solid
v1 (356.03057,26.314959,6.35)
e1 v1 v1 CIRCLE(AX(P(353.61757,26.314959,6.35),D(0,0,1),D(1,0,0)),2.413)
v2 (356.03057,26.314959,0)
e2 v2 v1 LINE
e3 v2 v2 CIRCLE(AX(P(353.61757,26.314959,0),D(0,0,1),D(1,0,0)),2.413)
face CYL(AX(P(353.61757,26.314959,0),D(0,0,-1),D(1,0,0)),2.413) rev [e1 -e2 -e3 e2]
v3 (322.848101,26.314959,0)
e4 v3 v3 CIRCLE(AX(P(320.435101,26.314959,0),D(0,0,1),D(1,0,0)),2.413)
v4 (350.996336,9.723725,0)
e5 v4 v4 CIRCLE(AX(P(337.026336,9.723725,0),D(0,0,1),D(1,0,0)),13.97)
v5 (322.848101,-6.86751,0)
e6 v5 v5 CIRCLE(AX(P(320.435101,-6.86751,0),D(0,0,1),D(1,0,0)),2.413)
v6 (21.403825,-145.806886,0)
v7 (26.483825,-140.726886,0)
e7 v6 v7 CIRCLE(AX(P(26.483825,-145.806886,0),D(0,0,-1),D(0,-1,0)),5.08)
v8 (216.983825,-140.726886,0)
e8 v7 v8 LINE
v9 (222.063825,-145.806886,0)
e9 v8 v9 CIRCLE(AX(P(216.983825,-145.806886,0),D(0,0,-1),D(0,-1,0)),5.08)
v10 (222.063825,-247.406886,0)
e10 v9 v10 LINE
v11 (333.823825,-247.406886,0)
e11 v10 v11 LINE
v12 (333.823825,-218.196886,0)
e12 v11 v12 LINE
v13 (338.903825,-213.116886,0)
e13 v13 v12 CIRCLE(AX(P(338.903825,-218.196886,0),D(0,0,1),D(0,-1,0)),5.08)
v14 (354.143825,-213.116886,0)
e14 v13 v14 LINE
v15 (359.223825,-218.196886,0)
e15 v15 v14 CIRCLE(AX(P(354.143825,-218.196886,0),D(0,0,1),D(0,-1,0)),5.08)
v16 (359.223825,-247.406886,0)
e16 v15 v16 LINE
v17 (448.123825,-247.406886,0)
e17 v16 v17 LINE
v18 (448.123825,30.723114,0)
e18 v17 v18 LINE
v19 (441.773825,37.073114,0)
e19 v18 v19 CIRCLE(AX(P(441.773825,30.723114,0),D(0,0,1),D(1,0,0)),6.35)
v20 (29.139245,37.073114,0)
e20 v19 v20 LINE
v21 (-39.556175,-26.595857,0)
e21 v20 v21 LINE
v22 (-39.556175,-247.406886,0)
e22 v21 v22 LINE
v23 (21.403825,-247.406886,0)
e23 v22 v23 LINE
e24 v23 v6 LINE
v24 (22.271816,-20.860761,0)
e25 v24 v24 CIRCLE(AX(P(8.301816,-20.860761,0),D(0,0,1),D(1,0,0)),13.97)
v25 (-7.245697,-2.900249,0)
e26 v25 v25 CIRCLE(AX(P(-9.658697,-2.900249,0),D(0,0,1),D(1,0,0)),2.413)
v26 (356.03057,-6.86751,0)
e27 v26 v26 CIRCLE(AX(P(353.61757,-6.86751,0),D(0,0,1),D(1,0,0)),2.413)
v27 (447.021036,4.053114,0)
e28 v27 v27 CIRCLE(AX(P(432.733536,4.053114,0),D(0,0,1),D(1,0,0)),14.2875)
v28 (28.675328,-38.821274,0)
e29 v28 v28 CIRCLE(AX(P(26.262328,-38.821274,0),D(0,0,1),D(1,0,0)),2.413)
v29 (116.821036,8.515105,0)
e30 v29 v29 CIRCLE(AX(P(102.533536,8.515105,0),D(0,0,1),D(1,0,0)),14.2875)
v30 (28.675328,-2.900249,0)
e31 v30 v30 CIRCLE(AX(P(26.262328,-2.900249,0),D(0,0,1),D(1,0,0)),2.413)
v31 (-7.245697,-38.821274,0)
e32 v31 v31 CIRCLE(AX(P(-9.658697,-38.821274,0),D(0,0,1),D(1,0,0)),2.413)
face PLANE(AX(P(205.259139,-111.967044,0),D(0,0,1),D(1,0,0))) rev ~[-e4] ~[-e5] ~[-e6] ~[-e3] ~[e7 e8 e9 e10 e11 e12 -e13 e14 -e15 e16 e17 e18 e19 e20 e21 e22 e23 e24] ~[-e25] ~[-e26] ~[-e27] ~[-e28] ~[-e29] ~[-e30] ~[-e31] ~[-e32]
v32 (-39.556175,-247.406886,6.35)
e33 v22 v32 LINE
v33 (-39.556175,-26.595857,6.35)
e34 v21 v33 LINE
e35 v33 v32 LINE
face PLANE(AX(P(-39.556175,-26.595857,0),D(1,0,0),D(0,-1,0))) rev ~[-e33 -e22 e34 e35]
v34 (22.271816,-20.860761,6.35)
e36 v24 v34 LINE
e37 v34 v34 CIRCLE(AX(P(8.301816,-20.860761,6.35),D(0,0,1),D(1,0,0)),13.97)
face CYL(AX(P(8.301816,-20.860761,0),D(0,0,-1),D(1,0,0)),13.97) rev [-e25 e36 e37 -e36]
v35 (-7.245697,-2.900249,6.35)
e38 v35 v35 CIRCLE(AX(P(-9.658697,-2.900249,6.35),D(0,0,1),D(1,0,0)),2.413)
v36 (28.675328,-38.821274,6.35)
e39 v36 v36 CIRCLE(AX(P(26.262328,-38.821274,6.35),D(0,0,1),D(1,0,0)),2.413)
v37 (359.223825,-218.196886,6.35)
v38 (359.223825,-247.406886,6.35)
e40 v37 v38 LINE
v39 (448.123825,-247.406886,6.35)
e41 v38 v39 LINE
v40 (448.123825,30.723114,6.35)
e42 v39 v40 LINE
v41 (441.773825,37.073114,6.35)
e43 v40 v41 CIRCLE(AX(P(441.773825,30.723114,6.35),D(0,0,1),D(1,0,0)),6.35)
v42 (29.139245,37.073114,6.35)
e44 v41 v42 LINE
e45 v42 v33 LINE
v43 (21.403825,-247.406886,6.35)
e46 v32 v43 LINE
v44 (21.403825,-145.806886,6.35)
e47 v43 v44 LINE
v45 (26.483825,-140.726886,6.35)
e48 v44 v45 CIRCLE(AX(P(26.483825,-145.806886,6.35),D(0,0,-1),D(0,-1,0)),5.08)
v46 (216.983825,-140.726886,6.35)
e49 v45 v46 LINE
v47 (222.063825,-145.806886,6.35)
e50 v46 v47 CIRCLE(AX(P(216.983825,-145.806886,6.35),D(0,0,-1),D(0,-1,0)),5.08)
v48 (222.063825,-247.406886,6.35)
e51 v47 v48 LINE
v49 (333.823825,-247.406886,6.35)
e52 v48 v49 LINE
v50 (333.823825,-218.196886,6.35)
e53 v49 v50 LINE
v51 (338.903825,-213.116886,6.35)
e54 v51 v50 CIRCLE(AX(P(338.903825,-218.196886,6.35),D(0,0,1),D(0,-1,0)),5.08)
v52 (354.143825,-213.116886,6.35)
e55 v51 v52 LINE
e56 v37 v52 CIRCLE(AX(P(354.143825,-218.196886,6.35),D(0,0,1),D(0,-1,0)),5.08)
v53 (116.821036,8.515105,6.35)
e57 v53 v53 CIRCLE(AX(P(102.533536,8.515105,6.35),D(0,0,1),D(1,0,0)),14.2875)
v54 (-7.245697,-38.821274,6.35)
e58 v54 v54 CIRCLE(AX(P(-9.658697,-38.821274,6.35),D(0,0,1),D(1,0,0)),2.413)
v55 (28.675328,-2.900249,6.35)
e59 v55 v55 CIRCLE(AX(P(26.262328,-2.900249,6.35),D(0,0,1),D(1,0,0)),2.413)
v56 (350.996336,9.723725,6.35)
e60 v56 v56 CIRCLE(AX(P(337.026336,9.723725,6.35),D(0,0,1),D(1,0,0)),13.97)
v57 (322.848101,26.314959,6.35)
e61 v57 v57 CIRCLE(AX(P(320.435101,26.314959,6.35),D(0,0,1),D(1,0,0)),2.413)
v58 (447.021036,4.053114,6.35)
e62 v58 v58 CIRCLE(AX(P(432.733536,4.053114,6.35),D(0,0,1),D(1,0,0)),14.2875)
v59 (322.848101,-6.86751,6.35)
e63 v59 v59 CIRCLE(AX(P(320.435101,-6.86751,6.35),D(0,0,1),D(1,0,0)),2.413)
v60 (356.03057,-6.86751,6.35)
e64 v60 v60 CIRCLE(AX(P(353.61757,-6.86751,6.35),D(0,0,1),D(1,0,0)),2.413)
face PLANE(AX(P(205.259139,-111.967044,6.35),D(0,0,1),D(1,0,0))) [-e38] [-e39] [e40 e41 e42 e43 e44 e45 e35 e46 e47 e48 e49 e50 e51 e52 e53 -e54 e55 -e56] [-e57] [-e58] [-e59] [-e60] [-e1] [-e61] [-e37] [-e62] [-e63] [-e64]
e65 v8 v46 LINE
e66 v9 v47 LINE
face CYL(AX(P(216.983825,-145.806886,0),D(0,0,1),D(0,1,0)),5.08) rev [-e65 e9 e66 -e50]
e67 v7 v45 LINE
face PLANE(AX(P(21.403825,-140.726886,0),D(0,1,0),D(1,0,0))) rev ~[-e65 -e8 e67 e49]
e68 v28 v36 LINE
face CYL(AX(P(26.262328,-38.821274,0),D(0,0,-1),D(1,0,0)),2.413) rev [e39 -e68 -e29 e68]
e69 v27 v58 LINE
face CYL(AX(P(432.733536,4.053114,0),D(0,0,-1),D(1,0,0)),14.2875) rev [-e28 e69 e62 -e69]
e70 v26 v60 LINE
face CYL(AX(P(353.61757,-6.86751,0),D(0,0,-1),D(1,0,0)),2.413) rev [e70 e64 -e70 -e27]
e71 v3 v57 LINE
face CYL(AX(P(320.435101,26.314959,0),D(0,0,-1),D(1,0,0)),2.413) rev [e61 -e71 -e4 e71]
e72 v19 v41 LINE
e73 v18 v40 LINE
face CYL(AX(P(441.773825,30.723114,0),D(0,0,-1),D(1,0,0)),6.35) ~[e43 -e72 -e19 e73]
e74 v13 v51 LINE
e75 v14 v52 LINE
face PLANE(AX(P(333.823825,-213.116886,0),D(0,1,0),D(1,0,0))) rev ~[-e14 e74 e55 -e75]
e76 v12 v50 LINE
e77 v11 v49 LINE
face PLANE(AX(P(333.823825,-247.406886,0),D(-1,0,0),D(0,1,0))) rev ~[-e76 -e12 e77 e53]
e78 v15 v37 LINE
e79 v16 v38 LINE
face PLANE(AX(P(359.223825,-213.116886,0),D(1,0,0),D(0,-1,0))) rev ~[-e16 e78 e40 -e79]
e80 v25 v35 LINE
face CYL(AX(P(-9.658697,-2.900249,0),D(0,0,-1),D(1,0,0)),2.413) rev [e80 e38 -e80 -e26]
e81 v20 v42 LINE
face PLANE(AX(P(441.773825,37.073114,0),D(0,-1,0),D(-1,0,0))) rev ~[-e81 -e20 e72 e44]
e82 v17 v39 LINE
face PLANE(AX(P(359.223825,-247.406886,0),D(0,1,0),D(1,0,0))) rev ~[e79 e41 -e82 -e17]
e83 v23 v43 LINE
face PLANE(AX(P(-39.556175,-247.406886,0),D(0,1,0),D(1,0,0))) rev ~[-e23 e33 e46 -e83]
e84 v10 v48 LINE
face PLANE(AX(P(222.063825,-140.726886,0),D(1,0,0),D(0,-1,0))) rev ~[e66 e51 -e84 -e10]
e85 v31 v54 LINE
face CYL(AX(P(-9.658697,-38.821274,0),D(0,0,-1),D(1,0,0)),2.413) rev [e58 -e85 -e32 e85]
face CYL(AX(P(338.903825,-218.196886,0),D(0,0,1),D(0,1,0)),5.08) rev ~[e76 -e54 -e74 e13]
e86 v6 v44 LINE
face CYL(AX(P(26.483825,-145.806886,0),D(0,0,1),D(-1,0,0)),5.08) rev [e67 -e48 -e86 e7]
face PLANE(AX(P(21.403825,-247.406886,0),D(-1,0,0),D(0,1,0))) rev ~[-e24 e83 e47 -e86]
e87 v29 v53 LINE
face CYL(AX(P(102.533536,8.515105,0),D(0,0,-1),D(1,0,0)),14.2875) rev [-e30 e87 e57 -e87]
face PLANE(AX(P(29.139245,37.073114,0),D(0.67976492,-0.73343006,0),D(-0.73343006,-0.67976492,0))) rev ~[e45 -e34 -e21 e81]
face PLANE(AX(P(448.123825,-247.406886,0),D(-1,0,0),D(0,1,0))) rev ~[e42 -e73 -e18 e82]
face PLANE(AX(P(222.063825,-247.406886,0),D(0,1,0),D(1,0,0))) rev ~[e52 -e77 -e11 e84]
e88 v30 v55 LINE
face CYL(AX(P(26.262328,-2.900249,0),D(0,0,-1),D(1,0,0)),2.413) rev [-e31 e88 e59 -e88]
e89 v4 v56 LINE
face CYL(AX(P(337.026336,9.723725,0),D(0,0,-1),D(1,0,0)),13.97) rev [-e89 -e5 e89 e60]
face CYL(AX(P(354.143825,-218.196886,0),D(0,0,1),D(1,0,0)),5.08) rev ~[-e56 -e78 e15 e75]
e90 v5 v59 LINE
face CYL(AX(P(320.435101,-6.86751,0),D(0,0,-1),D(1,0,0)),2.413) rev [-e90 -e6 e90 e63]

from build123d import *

# Parameters (mm, degrees)
F0_R     = 2.413
F0_R_2   = 13.97
F0_R_3   = 14.2875
F1_DEPTH = 6.35
F2_R     = 5.08


# Not quite as in the source:
# - a length typed as a fraction of an inch, garbled in the dataset ("3 / 203.2 mm" for 3/8 in), is restored


with BuildPart() as f1:
    # F0 (on Top) → F1 (new body)
    with BuildSketch(Plane.XY):
        with BuildLine():
            Line((441.7738245296, 37.0731139821), (29.1392452401, 37.0731139821))
            Line((29.1392452401, 37.0731139821), (-39.5561754704, -26.5958569453))
            Line((-39.5561754704, -26.5958569453), (-39.5561754704, -247.4068860179))
            Line((-39.5561754704, -247.4068860179), (21.4038245296, -247.4068860179))
            Line((21.4038245296, -247.4068860179), (21.4038245296, -140.7268860179))
            Line((21.4038245296, -140.7268860179), (222.0638245296, -140.7268860179))
            Line((222.0638245296, -140.7268860179), (222.0638245296, -247.4068860179))
            Line((222.0638245296, -247.4068860179), (333.8238245296, -247.4068860179))
            Line((333.8238245296, -247.4068860179), (333.8238245296, -213.1168860179))
            Line((333.8238245296, -213.1168860179), (359.2238245296, -213.1168860179))
            Line((359.2238245296, -213.1168860179), (359.2238245296, -247.4068860179))
            Line((359.2238245296, -247.4068860179), (448.1238245296, -247.4068860179))
            Line((448.1238245296, -247.4068860179), (448.1238245296, 30.7231139821))
            ThreePointArc((448.1238245296, 30.7231139821), (446.2639525902, 35.2132420426), (441.7738245296, 37.0731139821))
        make_face()
        with Locations((-9.6586965698, -38.8212736462)):
            Circle(F0_R, mode=Mode.SUBTRACT)
        with Locations((26.2623279145, -38.8212736462)):
            Circle(F0_R, mode=Mode.SUBTRACT)
        with Locations((8.3018156723, -20.860761404)):
            Circle(F0_R_2, mode=Mode.SUBTRACT)
        with Locations((-9.6586965698, -2.9002491619)):
            Circle(F0_R, mode=Mode.SUBTRACT)
        with Locations((26.2623279145, -2.9002491619)):
            Circle(F0_R, mode=Mode.SUBTRACT)
        with Locations((102.5335357666, 8.5151046671)):
            Circle(F0_R_3, mode=Mode.SUBTRACT)
        with Locations((320.4351010724, -6.8675098969)):
            Circle(F0_R, mode=Mode.SUBTRACT)
        with Locations((320.4351010724, 26.3149594916)):
            Circle(F0_R, mode=Mode.SUBTRACT)
        with Locations((353.6175704608, -6.8675098969)):
            Circle(F0_R, mode=Mode.SUBTRACT)
        with Locations((337.0263357666, 9.7237247974)):
            Circle(F0_R_2, mode=Mode.SUBTRACT)
        with Locations((353.6175704608, 26.3149594916)):
            Circle(F0_R, mode=Mode.SUBTRACT)
        with Locations((432.7335357666, 4.0531139821)):
            Circle(F0_R_3, mode=Mode.SUBTRACT)
    extrude(amount=F1_DEPTH)

    # F2
    f2_edges = [f1.edges().sort_by_distance(p)[0] for p in [
        (21.403825, -140.726886, 3.175),
        (222.063825, -140.726886, 3.175),
        (333.823825, -213.116886, 3.175),
        (359.223825, -213.116886, 3.175),
    ]]
    fillet(f2_edges, radius=F2_R)


solid = f1.part
